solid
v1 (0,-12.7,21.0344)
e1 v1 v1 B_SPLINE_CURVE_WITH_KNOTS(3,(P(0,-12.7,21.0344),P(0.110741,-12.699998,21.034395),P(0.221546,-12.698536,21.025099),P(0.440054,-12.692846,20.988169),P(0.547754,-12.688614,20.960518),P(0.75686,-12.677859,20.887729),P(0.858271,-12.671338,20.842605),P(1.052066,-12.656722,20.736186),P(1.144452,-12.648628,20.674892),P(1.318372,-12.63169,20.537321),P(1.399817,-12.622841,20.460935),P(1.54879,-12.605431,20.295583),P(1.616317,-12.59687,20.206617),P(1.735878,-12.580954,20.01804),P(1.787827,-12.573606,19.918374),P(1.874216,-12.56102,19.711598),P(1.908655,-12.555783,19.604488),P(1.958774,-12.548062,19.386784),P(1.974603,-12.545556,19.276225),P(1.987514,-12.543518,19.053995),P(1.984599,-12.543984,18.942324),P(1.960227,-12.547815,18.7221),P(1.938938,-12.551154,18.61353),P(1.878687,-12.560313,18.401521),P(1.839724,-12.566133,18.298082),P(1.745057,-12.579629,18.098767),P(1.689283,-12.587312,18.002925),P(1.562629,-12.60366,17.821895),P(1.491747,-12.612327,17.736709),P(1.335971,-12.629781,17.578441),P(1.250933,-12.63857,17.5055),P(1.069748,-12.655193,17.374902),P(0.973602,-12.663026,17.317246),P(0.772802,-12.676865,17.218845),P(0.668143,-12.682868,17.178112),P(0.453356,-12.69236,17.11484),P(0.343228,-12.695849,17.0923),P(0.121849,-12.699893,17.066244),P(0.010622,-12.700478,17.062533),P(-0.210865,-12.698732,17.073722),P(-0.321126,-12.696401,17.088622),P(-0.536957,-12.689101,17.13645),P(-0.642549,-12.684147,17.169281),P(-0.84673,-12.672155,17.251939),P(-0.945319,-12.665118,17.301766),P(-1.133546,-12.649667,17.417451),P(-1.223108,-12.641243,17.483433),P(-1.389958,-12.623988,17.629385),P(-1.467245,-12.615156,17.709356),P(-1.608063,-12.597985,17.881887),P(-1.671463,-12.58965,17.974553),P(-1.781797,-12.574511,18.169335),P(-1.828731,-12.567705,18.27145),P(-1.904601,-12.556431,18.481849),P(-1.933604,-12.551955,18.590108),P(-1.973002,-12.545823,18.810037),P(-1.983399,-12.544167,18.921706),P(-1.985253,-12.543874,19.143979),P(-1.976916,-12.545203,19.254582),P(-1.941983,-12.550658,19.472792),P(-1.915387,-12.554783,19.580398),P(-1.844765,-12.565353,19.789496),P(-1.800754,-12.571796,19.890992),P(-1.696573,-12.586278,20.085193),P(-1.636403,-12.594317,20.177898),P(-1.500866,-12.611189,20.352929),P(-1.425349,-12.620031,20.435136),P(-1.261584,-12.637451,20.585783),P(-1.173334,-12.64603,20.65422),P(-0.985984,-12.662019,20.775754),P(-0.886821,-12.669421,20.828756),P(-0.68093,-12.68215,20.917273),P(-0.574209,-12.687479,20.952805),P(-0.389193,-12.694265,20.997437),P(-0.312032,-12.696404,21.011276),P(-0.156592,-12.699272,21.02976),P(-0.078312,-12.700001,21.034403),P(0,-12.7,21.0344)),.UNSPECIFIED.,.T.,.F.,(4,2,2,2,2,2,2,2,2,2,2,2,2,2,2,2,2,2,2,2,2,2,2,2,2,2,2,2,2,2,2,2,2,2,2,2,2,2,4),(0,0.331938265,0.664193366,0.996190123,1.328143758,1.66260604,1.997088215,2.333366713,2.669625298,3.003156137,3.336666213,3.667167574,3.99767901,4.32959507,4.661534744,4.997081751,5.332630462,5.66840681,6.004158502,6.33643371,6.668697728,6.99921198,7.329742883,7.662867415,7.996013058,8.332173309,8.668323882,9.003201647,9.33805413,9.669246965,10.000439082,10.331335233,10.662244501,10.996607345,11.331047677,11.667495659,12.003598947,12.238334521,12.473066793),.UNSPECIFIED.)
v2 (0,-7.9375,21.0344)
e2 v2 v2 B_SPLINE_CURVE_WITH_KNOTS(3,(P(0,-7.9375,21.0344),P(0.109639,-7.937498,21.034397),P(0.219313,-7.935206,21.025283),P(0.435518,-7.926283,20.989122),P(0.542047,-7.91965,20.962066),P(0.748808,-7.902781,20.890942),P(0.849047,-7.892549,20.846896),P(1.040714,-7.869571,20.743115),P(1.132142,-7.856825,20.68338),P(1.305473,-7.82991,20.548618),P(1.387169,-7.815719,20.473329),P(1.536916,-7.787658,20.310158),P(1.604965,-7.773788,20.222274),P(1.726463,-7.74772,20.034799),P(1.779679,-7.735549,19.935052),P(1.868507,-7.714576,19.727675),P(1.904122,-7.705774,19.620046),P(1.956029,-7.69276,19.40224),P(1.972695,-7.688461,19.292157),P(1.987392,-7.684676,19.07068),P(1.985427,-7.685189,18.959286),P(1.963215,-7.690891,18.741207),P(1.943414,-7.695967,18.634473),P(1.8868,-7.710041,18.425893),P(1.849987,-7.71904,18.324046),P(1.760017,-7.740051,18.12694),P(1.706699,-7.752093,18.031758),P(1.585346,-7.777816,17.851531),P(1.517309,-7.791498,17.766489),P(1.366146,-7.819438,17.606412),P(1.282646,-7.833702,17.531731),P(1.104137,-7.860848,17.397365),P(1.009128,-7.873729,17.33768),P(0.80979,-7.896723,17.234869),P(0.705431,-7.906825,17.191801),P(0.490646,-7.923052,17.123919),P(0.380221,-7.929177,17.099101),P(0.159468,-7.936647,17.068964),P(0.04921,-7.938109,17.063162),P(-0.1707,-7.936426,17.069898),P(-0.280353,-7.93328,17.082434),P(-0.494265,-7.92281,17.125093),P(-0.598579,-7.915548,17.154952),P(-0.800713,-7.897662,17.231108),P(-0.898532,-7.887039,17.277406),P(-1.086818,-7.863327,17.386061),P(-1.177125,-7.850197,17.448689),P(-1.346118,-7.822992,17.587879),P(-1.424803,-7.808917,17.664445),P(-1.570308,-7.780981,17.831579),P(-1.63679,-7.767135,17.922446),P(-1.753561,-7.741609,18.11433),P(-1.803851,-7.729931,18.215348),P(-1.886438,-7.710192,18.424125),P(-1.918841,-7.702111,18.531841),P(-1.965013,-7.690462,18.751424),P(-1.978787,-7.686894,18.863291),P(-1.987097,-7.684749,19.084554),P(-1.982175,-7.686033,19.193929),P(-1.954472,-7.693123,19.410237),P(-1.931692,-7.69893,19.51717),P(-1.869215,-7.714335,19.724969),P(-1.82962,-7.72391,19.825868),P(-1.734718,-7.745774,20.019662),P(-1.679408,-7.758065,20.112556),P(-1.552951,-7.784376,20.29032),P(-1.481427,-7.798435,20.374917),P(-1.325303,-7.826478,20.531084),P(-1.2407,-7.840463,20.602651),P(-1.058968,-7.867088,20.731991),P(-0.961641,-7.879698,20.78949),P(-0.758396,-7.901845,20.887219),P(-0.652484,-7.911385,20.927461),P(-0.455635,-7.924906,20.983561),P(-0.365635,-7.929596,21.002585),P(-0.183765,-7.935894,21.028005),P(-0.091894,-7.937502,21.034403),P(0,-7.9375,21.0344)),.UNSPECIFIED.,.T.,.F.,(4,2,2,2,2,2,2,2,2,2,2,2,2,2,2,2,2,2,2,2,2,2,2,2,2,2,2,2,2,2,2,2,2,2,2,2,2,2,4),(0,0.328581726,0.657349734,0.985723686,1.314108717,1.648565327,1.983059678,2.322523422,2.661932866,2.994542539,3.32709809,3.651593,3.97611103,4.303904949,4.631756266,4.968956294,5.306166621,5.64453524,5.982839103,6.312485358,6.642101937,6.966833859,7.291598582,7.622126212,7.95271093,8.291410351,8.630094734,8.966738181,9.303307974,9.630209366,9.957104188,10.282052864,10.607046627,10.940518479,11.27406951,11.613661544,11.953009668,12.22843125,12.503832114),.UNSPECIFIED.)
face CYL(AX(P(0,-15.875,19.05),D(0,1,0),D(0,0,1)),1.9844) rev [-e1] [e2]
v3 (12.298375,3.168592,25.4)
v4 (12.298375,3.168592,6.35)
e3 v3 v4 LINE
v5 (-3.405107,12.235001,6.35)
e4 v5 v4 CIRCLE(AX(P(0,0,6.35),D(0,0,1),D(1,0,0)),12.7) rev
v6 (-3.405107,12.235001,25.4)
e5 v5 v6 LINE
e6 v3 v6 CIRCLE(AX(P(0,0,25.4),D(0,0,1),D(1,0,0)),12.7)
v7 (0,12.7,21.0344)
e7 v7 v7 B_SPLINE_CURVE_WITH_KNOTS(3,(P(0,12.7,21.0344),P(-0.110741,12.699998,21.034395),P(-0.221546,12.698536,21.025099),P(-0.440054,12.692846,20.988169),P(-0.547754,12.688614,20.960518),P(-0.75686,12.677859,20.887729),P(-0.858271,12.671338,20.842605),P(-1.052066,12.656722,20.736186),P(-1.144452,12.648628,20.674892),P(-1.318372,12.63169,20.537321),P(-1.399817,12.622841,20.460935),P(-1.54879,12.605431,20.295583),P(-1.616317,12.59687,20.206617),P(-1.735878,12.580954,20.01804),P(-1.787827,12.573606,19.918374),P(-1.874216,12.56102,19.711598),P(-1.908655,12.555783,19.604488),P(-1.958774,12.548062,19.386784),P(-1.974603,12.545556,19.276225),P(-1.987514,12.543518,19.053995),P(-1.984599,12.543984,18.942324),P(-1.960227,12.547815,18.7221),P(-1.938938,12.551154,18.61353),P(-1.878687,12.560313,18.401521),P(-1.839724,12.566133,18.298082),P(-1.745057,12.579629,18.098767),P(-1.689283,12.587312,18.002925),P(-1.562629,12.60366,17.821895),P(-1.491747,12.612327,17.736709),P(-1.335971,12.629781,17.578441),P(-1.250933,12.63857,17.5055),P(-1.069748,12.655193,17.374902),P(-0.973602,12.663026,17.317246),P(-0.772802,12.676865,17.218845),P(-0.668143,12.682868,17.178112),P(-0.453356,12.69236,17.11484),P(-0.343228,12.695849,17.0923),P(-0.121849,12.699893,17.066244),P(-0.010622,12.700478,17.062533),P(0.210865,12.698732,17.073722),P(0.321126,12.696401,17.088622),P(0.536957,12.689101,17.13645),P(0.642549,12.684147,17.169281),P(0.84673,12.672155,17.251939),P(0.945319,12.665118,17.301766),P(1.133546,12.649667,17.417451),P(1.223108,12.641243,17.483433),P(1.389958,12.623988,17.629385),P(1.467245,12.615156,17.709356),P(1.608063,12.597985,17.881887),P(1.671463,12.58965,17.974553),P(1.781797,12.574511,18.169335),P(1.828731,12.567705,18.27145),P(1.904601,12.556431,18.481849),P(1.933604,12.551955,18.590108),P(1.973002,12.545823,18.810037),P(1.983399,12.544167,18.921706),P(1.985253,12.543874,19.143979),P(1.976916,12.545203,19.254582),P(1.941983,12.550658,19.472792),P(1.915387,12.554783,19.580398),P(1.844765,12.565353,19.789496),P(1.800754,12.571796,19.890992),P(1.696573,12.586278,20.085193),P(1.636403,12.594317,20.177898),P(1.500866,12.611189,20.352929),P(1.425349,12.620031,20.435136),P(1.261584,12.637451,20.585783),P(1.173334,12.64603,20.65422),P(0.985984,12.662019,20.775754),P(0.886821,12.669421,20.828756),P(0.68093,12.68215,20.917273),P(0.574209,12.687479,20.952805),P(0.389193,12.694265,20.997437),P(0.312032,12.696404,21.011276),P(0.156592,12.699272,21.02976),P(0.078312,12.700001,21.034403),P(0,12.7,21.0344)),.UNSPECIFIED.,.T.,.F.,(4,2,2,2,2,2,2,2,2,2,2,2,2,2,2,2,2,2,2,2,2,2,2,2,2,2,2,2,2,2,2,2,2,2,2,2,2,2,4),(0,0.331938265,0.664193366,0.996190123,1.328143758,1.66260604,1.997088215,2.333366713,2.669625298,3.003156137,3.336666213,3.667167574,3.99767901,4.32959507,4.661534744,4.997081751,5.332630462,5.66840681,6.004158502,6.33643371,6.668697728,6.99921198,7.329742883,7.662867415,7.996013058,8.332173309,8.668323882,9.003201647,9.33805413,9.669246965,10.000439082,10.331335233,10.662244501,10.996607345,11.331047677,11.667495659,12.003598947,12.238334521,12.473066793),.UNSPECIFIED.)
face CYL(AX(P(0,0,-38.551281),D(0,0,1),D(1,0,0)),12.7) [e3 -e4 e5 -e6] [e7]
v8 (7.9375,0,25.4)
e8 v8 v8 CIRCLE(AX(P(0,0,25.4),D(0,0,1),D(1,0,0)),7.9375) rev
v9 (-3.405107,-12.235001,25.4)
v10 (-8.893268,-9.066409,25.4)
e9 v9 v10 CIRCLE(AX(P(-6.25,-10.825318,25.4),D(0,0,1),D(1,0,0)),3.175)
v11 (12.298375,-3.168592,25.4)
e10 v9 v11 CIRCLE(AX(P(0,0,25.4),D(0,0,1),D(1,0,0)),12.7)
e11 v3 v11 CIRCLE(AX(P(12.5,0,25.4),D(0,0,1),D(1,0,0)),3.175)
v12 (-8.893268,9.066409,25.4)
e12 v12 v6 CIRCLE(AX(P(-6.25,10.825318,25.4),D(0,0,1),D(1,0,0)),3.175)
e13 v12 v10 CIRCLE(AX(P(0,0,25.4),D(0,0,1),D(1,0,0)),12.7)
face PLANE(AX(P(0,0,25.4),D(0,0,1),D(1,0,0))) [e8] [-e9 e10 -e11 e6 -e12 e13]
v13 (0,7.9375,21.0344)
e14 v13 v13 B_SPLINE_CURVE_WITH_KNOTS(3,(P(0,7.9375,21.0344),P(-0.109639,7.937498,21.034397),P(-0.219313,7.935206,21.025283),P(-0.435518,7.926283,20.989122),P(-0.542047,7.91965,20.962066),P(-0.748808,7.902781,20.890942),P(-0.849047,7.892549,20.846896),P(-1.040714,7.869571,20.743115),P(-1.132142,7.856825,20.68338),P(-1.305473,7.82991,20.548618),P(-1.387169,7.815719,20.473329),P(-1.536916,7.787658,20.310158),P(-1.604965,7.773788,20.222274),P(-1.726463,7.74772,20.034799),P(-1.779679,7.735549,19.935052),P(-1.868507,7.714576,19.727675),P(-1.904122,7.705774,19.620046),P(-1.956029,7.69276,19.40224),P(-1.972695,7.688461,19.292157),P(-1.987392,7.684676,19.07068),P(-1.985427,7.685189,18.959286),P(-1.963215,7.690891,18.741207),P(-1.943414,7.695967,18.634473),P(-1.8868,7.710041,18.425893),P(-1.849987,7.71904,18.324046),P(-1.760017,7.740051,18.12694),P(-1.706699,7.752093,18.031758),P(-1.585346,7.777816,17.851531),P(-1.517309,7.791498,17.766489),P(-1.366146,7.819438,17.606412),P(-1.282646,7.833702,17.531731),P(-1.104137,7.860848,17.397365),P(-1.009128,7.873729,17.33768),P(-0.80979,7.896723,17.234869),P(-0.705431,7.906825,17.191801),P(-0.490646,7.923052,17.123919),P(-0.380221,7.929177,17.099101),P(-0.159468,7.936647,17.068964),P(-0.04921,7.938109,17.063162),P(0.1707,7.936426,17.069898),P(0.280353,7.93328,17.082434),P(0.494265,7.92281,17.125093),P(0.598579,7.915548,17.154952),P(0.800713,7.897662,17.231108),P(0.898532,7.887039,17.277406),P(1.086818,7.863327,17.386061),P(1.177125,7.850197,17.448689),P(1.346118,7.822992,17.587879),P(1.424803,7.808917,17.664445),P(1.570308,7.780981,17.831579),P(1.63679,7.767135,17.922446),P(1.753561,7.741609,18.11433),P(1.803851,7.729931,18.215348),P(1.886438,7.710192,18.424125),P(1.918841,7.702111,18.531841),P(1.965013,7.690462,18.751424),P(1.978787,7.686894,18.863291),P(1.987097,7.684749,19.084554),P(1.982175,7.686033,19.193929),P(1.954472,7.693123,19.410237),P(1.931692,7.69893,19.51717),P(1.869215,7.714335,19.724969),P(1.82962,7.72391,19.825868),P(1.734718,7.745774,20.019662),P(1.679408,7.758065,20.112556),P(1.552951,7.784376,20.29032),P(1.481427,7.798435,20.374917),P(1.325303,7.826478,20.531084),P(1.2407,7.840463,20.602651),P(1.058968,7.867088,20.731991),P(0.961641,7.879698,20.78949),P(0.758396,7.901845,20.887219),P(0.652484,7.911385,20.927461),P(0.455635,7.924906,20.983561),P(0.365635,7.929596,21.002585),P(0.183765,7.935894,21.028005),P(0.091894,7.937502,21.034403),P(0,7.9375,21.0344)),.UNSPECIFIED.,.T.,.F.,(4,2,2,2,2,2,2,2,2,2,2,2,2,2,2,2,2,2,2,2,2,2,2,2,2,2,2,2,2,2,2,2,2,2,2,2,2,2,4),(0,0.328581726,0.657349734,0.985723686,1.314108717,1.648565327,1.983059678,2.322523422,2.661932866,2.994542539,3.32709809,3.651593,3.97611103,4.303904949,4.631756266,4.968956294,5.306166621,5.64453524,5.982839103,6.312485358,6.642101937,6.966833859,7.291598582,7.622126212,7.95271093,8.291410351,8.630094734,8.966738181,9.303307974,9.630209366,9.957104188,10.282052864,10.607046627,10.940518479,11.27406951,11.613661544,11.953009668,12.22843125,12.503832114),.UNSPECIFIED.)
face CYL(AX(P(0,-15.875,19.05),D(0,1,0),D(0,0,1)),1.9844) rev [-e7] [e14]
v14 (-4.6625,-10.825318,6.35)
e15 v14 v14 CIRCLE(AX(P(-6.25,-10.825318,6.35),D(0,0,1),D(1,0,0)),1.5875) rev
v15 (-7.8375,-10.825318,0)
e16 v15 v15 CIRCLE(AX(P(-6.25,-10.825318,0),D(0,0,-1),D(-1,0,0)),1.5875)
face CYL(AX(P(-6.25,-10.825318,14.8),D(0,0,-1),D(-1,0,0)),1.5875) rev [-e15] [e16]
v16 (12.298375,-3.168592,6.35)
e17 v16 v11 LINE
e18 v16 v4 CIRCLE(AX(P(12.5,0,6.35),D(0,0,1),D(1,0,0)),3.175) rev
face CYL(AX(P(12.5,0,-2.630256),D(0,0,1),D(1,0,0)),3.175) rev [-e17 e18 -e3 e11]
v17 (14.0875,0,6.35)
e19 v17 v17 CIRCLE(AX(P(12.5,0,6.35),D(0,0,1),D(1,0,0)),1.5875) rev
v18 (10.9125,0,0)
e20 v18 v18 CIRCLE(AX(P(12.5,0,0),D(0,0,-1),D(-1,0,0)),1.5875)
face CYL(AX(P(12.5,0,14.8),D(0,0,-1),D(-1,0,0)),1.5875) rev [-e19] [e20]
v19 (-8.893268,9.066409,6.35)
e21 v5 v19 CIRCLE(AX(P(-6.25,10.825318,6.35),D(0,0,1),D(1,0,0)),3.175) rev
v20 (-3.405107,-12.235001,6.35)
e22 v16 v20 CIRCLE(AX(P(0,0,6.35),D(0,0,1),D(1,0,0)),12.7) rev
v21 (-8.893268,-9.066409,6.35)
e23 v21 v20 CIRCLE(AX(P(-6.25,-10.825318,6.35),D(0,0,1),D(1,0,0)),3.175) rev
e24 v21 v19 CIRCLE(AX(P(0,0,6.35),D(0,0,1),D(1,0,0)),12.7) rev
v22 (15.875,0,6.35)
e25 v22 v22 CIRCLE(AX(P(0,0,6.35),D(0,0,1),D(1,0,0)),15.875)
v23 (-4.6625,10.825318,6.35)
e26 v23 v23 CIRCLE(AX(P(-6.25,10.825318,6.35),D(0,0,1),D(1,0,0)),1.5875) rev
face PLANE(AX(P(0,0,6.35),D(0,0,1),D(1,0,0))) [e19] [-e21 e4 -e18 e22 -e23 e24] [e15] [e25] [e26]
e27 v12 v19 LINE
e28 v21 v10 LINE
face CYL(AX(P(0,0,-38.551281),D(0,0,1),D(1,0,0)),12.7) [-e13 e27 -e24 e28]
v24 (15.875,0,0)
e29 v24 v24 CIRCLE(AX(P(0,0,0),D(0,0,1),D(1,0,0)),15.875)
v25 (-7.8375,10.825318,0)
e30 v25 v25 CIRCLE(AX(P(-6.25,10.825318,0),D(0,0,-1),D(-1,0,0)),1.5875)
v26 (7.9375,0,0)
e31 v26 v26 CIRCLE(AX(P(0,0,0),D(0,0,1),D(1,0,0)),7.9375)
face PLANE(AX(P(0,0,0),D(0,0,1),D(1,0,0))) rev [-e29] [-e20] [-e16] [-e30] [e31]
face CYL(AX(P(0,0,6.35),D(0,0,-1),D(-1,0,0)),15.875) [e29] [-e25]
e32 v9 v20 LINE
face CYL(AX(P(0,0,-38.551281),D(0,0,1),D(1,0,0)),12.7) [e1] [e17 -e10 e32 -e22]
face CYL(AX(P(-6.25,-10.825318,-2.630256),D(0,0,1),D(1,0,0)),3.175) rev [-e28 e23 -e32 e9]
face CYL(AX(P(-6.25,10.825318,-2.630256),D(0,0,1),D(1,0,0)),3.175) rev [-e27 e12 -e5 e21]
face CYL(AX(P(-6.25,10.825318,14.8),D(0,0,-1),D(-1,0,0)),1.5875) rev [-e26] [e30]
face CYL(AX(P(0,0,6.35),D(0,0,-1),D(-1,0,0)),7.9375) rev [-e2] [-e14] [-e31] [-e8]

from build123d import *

# Parameters (mm, degrees)
SKETCH1_R                           = 15.875
SKETCH1_R_2                         = 7.9375
BOSS_EXTRUDE1_DEPTH                 = 6.35
SKETCH2_R                           = 14.29
SKETCH2_R_2                         = 7.9375
BOSS_EXTRUDE2_DEPTH                 = 19.05
SKETCH3_R                           = 1.5875
CUT_EXTRUDE1_DEPTH                  = 14.8
CUT_EXTRUDE3_DEPTH                  = 34.89972345
CUT_EXTRUDE3_DEPTH_BACK             = 34.89972345
SKETCH4_R                           = 1.9844
SKETCH5_R                           = 3.175
CUT_EXTRUDE4_DEPTH                  = 19.05
CUT_START                           = -19.05
CUT_CHANGE_FROM_065_WT_TO_125_DEPTH = 19.05


# Read off the part's stored shape, not the designer's step: Cut- Change from .065 WT to .125
with BuildPart() as part:
    # Sketch1 → Boss-Extrude1 (new body)
    with BuildSketch(Plane.XY):
        Circle(SKETCH1_R)
        Circle(SKETCH1_R_2, mode=Mode.SUBTRACT)
    extrude(amount=BOSS_EXTRUDE1_DEPTH)

    # Sketch2 → Boss-Extrude2 (add)
    with BuildSketch(Plane.XY.offset(6.35)):
        Circle(SKETCH2_R)
        Circle(SKETCH2_R_2, mode=Mode.SUBTRACT)
    extrude(amount=BOSS_EXTRUDE2_DEPTH)

    # Sketch3 → Cut-Extrude1 (cut)
    with BuildSketch(Plane(origin=(0, 0, 0), x_dir=(-1, 0, 0), z_dir=(0, 0, -1))):
        with Locations((6.25, 10.825317547)):
            Circle(SKETCH3_R)
        with Locations((6.25, -10.825317547)):
            Circle(SKETCH3_R)
        with Locations((-12.5, 0)):
            Circle(SKETCH3_R)
    extrude(amount=-CUT_EXTRUDE1_DEPTH, mode=Mode.SUBTRACT)

    # Sketch4 → Cut-Extrude3 (cut, two sides: drawn at the far end of the back side and taken through both)
    with BuildSketch(Plane(origin=(0, 0, 0), x_dir=(1, 0, 0), z_dir=(0, 1, 0)).offset(-CUT_EXTRUDE3_DEPTH_BACK)):
        with Locations(Location((0, -19.05, 0), (0, 0, 270))):
            Circle(SKETCH4_R)
    extrude(amount=CUT_EXTRUDE3_DEPTH + CUT_EXTRUDE3_DEPTH_BACK, mode=Mode.SUBTRACT)

    # Sketch5 → Cut-Extrude4 (cut)
    with BuildSketch(Plane.XY.offset(25.4)):
        with Locations((-6.25, 10.825317547)):
            Circle(SKETCH5_R)
        with Locations((12.5, 0)):
            Circle(SKETCH5_R)
        with Locations((-6.25, -10.825317547)):
            Circle(SKETCH5_R)
    extrude(amount=-CUT_EXTRUDE4_DEPTH, mode=Mode.SUBTRACT)

    # Cut- Change from .065 WT to .125 outline → Cut- Change from .065 WT to .125 (cut)
    with BuildSketch(Plane.XY.offset(25.4).offset(CUT_START)):
        with BuildLine():
            ThreePointArc((-8.893268269, -9.066409404), (-12.7, 0), (-8.893268269, 9.066409404))
            ThreePointArc((-8.893268269, 9.066409404), (-9.276867733, 9.866830861), (-9.423910813, 10.742160164))
            ThreePointArc((-9.423910813, 10.742160164), (-14.29, 0), (-9.423910813, -10.742160164))
            ThreePointArc((-9.423910813, -10.742160164), (-9.276867733, -9.866830861), (-8.893268269, -9.066409404))
        make_face()
        with BuildLine():
            ThreePointArc((-4.591028187, 13.532426249), (-3.906492314, 12.967418555), (-3.405106731, 12.235000946))
            ThreePointArc((-3.405106731, 12.235000946), (6.35, 10.998522628), (12.298375, 3.168591542))
            ThreePointArc((12.298375, 3.168591542), (13.183360047, 3.100587694), (14.014939, 2.790266085))
            ThreePointArc((14.014939, 2.790266085), (7.145, 12.37550302), (-4.591028187, 13.532426249))
        make_face()
        with BuildLine():
            ThreePointArc((12.298375, -3.168591542), (6.35, -10.998522628), (-3.405106731, -12.235000946))
            ThreePointArc((-3.405106731, -12.235000946), (-3.906492314, -12.967418555), (-4.591028187, -13.532426249))
            ThreePointArc((-4.591028187, -13.532426249), (7.145, -12.37550302), (14.014939, -2.790266085))
            ThreePointArc((14.014939, -2.790266085), (13.183360047, -3.100587694), (12.298375, -3.168591542))
        make_face()
    extrude(amount=CUT_CHANGE_FROM_065_WT_TO_125_DEPTH, mode=Mode.SUBTRACT)


solid = part.part
